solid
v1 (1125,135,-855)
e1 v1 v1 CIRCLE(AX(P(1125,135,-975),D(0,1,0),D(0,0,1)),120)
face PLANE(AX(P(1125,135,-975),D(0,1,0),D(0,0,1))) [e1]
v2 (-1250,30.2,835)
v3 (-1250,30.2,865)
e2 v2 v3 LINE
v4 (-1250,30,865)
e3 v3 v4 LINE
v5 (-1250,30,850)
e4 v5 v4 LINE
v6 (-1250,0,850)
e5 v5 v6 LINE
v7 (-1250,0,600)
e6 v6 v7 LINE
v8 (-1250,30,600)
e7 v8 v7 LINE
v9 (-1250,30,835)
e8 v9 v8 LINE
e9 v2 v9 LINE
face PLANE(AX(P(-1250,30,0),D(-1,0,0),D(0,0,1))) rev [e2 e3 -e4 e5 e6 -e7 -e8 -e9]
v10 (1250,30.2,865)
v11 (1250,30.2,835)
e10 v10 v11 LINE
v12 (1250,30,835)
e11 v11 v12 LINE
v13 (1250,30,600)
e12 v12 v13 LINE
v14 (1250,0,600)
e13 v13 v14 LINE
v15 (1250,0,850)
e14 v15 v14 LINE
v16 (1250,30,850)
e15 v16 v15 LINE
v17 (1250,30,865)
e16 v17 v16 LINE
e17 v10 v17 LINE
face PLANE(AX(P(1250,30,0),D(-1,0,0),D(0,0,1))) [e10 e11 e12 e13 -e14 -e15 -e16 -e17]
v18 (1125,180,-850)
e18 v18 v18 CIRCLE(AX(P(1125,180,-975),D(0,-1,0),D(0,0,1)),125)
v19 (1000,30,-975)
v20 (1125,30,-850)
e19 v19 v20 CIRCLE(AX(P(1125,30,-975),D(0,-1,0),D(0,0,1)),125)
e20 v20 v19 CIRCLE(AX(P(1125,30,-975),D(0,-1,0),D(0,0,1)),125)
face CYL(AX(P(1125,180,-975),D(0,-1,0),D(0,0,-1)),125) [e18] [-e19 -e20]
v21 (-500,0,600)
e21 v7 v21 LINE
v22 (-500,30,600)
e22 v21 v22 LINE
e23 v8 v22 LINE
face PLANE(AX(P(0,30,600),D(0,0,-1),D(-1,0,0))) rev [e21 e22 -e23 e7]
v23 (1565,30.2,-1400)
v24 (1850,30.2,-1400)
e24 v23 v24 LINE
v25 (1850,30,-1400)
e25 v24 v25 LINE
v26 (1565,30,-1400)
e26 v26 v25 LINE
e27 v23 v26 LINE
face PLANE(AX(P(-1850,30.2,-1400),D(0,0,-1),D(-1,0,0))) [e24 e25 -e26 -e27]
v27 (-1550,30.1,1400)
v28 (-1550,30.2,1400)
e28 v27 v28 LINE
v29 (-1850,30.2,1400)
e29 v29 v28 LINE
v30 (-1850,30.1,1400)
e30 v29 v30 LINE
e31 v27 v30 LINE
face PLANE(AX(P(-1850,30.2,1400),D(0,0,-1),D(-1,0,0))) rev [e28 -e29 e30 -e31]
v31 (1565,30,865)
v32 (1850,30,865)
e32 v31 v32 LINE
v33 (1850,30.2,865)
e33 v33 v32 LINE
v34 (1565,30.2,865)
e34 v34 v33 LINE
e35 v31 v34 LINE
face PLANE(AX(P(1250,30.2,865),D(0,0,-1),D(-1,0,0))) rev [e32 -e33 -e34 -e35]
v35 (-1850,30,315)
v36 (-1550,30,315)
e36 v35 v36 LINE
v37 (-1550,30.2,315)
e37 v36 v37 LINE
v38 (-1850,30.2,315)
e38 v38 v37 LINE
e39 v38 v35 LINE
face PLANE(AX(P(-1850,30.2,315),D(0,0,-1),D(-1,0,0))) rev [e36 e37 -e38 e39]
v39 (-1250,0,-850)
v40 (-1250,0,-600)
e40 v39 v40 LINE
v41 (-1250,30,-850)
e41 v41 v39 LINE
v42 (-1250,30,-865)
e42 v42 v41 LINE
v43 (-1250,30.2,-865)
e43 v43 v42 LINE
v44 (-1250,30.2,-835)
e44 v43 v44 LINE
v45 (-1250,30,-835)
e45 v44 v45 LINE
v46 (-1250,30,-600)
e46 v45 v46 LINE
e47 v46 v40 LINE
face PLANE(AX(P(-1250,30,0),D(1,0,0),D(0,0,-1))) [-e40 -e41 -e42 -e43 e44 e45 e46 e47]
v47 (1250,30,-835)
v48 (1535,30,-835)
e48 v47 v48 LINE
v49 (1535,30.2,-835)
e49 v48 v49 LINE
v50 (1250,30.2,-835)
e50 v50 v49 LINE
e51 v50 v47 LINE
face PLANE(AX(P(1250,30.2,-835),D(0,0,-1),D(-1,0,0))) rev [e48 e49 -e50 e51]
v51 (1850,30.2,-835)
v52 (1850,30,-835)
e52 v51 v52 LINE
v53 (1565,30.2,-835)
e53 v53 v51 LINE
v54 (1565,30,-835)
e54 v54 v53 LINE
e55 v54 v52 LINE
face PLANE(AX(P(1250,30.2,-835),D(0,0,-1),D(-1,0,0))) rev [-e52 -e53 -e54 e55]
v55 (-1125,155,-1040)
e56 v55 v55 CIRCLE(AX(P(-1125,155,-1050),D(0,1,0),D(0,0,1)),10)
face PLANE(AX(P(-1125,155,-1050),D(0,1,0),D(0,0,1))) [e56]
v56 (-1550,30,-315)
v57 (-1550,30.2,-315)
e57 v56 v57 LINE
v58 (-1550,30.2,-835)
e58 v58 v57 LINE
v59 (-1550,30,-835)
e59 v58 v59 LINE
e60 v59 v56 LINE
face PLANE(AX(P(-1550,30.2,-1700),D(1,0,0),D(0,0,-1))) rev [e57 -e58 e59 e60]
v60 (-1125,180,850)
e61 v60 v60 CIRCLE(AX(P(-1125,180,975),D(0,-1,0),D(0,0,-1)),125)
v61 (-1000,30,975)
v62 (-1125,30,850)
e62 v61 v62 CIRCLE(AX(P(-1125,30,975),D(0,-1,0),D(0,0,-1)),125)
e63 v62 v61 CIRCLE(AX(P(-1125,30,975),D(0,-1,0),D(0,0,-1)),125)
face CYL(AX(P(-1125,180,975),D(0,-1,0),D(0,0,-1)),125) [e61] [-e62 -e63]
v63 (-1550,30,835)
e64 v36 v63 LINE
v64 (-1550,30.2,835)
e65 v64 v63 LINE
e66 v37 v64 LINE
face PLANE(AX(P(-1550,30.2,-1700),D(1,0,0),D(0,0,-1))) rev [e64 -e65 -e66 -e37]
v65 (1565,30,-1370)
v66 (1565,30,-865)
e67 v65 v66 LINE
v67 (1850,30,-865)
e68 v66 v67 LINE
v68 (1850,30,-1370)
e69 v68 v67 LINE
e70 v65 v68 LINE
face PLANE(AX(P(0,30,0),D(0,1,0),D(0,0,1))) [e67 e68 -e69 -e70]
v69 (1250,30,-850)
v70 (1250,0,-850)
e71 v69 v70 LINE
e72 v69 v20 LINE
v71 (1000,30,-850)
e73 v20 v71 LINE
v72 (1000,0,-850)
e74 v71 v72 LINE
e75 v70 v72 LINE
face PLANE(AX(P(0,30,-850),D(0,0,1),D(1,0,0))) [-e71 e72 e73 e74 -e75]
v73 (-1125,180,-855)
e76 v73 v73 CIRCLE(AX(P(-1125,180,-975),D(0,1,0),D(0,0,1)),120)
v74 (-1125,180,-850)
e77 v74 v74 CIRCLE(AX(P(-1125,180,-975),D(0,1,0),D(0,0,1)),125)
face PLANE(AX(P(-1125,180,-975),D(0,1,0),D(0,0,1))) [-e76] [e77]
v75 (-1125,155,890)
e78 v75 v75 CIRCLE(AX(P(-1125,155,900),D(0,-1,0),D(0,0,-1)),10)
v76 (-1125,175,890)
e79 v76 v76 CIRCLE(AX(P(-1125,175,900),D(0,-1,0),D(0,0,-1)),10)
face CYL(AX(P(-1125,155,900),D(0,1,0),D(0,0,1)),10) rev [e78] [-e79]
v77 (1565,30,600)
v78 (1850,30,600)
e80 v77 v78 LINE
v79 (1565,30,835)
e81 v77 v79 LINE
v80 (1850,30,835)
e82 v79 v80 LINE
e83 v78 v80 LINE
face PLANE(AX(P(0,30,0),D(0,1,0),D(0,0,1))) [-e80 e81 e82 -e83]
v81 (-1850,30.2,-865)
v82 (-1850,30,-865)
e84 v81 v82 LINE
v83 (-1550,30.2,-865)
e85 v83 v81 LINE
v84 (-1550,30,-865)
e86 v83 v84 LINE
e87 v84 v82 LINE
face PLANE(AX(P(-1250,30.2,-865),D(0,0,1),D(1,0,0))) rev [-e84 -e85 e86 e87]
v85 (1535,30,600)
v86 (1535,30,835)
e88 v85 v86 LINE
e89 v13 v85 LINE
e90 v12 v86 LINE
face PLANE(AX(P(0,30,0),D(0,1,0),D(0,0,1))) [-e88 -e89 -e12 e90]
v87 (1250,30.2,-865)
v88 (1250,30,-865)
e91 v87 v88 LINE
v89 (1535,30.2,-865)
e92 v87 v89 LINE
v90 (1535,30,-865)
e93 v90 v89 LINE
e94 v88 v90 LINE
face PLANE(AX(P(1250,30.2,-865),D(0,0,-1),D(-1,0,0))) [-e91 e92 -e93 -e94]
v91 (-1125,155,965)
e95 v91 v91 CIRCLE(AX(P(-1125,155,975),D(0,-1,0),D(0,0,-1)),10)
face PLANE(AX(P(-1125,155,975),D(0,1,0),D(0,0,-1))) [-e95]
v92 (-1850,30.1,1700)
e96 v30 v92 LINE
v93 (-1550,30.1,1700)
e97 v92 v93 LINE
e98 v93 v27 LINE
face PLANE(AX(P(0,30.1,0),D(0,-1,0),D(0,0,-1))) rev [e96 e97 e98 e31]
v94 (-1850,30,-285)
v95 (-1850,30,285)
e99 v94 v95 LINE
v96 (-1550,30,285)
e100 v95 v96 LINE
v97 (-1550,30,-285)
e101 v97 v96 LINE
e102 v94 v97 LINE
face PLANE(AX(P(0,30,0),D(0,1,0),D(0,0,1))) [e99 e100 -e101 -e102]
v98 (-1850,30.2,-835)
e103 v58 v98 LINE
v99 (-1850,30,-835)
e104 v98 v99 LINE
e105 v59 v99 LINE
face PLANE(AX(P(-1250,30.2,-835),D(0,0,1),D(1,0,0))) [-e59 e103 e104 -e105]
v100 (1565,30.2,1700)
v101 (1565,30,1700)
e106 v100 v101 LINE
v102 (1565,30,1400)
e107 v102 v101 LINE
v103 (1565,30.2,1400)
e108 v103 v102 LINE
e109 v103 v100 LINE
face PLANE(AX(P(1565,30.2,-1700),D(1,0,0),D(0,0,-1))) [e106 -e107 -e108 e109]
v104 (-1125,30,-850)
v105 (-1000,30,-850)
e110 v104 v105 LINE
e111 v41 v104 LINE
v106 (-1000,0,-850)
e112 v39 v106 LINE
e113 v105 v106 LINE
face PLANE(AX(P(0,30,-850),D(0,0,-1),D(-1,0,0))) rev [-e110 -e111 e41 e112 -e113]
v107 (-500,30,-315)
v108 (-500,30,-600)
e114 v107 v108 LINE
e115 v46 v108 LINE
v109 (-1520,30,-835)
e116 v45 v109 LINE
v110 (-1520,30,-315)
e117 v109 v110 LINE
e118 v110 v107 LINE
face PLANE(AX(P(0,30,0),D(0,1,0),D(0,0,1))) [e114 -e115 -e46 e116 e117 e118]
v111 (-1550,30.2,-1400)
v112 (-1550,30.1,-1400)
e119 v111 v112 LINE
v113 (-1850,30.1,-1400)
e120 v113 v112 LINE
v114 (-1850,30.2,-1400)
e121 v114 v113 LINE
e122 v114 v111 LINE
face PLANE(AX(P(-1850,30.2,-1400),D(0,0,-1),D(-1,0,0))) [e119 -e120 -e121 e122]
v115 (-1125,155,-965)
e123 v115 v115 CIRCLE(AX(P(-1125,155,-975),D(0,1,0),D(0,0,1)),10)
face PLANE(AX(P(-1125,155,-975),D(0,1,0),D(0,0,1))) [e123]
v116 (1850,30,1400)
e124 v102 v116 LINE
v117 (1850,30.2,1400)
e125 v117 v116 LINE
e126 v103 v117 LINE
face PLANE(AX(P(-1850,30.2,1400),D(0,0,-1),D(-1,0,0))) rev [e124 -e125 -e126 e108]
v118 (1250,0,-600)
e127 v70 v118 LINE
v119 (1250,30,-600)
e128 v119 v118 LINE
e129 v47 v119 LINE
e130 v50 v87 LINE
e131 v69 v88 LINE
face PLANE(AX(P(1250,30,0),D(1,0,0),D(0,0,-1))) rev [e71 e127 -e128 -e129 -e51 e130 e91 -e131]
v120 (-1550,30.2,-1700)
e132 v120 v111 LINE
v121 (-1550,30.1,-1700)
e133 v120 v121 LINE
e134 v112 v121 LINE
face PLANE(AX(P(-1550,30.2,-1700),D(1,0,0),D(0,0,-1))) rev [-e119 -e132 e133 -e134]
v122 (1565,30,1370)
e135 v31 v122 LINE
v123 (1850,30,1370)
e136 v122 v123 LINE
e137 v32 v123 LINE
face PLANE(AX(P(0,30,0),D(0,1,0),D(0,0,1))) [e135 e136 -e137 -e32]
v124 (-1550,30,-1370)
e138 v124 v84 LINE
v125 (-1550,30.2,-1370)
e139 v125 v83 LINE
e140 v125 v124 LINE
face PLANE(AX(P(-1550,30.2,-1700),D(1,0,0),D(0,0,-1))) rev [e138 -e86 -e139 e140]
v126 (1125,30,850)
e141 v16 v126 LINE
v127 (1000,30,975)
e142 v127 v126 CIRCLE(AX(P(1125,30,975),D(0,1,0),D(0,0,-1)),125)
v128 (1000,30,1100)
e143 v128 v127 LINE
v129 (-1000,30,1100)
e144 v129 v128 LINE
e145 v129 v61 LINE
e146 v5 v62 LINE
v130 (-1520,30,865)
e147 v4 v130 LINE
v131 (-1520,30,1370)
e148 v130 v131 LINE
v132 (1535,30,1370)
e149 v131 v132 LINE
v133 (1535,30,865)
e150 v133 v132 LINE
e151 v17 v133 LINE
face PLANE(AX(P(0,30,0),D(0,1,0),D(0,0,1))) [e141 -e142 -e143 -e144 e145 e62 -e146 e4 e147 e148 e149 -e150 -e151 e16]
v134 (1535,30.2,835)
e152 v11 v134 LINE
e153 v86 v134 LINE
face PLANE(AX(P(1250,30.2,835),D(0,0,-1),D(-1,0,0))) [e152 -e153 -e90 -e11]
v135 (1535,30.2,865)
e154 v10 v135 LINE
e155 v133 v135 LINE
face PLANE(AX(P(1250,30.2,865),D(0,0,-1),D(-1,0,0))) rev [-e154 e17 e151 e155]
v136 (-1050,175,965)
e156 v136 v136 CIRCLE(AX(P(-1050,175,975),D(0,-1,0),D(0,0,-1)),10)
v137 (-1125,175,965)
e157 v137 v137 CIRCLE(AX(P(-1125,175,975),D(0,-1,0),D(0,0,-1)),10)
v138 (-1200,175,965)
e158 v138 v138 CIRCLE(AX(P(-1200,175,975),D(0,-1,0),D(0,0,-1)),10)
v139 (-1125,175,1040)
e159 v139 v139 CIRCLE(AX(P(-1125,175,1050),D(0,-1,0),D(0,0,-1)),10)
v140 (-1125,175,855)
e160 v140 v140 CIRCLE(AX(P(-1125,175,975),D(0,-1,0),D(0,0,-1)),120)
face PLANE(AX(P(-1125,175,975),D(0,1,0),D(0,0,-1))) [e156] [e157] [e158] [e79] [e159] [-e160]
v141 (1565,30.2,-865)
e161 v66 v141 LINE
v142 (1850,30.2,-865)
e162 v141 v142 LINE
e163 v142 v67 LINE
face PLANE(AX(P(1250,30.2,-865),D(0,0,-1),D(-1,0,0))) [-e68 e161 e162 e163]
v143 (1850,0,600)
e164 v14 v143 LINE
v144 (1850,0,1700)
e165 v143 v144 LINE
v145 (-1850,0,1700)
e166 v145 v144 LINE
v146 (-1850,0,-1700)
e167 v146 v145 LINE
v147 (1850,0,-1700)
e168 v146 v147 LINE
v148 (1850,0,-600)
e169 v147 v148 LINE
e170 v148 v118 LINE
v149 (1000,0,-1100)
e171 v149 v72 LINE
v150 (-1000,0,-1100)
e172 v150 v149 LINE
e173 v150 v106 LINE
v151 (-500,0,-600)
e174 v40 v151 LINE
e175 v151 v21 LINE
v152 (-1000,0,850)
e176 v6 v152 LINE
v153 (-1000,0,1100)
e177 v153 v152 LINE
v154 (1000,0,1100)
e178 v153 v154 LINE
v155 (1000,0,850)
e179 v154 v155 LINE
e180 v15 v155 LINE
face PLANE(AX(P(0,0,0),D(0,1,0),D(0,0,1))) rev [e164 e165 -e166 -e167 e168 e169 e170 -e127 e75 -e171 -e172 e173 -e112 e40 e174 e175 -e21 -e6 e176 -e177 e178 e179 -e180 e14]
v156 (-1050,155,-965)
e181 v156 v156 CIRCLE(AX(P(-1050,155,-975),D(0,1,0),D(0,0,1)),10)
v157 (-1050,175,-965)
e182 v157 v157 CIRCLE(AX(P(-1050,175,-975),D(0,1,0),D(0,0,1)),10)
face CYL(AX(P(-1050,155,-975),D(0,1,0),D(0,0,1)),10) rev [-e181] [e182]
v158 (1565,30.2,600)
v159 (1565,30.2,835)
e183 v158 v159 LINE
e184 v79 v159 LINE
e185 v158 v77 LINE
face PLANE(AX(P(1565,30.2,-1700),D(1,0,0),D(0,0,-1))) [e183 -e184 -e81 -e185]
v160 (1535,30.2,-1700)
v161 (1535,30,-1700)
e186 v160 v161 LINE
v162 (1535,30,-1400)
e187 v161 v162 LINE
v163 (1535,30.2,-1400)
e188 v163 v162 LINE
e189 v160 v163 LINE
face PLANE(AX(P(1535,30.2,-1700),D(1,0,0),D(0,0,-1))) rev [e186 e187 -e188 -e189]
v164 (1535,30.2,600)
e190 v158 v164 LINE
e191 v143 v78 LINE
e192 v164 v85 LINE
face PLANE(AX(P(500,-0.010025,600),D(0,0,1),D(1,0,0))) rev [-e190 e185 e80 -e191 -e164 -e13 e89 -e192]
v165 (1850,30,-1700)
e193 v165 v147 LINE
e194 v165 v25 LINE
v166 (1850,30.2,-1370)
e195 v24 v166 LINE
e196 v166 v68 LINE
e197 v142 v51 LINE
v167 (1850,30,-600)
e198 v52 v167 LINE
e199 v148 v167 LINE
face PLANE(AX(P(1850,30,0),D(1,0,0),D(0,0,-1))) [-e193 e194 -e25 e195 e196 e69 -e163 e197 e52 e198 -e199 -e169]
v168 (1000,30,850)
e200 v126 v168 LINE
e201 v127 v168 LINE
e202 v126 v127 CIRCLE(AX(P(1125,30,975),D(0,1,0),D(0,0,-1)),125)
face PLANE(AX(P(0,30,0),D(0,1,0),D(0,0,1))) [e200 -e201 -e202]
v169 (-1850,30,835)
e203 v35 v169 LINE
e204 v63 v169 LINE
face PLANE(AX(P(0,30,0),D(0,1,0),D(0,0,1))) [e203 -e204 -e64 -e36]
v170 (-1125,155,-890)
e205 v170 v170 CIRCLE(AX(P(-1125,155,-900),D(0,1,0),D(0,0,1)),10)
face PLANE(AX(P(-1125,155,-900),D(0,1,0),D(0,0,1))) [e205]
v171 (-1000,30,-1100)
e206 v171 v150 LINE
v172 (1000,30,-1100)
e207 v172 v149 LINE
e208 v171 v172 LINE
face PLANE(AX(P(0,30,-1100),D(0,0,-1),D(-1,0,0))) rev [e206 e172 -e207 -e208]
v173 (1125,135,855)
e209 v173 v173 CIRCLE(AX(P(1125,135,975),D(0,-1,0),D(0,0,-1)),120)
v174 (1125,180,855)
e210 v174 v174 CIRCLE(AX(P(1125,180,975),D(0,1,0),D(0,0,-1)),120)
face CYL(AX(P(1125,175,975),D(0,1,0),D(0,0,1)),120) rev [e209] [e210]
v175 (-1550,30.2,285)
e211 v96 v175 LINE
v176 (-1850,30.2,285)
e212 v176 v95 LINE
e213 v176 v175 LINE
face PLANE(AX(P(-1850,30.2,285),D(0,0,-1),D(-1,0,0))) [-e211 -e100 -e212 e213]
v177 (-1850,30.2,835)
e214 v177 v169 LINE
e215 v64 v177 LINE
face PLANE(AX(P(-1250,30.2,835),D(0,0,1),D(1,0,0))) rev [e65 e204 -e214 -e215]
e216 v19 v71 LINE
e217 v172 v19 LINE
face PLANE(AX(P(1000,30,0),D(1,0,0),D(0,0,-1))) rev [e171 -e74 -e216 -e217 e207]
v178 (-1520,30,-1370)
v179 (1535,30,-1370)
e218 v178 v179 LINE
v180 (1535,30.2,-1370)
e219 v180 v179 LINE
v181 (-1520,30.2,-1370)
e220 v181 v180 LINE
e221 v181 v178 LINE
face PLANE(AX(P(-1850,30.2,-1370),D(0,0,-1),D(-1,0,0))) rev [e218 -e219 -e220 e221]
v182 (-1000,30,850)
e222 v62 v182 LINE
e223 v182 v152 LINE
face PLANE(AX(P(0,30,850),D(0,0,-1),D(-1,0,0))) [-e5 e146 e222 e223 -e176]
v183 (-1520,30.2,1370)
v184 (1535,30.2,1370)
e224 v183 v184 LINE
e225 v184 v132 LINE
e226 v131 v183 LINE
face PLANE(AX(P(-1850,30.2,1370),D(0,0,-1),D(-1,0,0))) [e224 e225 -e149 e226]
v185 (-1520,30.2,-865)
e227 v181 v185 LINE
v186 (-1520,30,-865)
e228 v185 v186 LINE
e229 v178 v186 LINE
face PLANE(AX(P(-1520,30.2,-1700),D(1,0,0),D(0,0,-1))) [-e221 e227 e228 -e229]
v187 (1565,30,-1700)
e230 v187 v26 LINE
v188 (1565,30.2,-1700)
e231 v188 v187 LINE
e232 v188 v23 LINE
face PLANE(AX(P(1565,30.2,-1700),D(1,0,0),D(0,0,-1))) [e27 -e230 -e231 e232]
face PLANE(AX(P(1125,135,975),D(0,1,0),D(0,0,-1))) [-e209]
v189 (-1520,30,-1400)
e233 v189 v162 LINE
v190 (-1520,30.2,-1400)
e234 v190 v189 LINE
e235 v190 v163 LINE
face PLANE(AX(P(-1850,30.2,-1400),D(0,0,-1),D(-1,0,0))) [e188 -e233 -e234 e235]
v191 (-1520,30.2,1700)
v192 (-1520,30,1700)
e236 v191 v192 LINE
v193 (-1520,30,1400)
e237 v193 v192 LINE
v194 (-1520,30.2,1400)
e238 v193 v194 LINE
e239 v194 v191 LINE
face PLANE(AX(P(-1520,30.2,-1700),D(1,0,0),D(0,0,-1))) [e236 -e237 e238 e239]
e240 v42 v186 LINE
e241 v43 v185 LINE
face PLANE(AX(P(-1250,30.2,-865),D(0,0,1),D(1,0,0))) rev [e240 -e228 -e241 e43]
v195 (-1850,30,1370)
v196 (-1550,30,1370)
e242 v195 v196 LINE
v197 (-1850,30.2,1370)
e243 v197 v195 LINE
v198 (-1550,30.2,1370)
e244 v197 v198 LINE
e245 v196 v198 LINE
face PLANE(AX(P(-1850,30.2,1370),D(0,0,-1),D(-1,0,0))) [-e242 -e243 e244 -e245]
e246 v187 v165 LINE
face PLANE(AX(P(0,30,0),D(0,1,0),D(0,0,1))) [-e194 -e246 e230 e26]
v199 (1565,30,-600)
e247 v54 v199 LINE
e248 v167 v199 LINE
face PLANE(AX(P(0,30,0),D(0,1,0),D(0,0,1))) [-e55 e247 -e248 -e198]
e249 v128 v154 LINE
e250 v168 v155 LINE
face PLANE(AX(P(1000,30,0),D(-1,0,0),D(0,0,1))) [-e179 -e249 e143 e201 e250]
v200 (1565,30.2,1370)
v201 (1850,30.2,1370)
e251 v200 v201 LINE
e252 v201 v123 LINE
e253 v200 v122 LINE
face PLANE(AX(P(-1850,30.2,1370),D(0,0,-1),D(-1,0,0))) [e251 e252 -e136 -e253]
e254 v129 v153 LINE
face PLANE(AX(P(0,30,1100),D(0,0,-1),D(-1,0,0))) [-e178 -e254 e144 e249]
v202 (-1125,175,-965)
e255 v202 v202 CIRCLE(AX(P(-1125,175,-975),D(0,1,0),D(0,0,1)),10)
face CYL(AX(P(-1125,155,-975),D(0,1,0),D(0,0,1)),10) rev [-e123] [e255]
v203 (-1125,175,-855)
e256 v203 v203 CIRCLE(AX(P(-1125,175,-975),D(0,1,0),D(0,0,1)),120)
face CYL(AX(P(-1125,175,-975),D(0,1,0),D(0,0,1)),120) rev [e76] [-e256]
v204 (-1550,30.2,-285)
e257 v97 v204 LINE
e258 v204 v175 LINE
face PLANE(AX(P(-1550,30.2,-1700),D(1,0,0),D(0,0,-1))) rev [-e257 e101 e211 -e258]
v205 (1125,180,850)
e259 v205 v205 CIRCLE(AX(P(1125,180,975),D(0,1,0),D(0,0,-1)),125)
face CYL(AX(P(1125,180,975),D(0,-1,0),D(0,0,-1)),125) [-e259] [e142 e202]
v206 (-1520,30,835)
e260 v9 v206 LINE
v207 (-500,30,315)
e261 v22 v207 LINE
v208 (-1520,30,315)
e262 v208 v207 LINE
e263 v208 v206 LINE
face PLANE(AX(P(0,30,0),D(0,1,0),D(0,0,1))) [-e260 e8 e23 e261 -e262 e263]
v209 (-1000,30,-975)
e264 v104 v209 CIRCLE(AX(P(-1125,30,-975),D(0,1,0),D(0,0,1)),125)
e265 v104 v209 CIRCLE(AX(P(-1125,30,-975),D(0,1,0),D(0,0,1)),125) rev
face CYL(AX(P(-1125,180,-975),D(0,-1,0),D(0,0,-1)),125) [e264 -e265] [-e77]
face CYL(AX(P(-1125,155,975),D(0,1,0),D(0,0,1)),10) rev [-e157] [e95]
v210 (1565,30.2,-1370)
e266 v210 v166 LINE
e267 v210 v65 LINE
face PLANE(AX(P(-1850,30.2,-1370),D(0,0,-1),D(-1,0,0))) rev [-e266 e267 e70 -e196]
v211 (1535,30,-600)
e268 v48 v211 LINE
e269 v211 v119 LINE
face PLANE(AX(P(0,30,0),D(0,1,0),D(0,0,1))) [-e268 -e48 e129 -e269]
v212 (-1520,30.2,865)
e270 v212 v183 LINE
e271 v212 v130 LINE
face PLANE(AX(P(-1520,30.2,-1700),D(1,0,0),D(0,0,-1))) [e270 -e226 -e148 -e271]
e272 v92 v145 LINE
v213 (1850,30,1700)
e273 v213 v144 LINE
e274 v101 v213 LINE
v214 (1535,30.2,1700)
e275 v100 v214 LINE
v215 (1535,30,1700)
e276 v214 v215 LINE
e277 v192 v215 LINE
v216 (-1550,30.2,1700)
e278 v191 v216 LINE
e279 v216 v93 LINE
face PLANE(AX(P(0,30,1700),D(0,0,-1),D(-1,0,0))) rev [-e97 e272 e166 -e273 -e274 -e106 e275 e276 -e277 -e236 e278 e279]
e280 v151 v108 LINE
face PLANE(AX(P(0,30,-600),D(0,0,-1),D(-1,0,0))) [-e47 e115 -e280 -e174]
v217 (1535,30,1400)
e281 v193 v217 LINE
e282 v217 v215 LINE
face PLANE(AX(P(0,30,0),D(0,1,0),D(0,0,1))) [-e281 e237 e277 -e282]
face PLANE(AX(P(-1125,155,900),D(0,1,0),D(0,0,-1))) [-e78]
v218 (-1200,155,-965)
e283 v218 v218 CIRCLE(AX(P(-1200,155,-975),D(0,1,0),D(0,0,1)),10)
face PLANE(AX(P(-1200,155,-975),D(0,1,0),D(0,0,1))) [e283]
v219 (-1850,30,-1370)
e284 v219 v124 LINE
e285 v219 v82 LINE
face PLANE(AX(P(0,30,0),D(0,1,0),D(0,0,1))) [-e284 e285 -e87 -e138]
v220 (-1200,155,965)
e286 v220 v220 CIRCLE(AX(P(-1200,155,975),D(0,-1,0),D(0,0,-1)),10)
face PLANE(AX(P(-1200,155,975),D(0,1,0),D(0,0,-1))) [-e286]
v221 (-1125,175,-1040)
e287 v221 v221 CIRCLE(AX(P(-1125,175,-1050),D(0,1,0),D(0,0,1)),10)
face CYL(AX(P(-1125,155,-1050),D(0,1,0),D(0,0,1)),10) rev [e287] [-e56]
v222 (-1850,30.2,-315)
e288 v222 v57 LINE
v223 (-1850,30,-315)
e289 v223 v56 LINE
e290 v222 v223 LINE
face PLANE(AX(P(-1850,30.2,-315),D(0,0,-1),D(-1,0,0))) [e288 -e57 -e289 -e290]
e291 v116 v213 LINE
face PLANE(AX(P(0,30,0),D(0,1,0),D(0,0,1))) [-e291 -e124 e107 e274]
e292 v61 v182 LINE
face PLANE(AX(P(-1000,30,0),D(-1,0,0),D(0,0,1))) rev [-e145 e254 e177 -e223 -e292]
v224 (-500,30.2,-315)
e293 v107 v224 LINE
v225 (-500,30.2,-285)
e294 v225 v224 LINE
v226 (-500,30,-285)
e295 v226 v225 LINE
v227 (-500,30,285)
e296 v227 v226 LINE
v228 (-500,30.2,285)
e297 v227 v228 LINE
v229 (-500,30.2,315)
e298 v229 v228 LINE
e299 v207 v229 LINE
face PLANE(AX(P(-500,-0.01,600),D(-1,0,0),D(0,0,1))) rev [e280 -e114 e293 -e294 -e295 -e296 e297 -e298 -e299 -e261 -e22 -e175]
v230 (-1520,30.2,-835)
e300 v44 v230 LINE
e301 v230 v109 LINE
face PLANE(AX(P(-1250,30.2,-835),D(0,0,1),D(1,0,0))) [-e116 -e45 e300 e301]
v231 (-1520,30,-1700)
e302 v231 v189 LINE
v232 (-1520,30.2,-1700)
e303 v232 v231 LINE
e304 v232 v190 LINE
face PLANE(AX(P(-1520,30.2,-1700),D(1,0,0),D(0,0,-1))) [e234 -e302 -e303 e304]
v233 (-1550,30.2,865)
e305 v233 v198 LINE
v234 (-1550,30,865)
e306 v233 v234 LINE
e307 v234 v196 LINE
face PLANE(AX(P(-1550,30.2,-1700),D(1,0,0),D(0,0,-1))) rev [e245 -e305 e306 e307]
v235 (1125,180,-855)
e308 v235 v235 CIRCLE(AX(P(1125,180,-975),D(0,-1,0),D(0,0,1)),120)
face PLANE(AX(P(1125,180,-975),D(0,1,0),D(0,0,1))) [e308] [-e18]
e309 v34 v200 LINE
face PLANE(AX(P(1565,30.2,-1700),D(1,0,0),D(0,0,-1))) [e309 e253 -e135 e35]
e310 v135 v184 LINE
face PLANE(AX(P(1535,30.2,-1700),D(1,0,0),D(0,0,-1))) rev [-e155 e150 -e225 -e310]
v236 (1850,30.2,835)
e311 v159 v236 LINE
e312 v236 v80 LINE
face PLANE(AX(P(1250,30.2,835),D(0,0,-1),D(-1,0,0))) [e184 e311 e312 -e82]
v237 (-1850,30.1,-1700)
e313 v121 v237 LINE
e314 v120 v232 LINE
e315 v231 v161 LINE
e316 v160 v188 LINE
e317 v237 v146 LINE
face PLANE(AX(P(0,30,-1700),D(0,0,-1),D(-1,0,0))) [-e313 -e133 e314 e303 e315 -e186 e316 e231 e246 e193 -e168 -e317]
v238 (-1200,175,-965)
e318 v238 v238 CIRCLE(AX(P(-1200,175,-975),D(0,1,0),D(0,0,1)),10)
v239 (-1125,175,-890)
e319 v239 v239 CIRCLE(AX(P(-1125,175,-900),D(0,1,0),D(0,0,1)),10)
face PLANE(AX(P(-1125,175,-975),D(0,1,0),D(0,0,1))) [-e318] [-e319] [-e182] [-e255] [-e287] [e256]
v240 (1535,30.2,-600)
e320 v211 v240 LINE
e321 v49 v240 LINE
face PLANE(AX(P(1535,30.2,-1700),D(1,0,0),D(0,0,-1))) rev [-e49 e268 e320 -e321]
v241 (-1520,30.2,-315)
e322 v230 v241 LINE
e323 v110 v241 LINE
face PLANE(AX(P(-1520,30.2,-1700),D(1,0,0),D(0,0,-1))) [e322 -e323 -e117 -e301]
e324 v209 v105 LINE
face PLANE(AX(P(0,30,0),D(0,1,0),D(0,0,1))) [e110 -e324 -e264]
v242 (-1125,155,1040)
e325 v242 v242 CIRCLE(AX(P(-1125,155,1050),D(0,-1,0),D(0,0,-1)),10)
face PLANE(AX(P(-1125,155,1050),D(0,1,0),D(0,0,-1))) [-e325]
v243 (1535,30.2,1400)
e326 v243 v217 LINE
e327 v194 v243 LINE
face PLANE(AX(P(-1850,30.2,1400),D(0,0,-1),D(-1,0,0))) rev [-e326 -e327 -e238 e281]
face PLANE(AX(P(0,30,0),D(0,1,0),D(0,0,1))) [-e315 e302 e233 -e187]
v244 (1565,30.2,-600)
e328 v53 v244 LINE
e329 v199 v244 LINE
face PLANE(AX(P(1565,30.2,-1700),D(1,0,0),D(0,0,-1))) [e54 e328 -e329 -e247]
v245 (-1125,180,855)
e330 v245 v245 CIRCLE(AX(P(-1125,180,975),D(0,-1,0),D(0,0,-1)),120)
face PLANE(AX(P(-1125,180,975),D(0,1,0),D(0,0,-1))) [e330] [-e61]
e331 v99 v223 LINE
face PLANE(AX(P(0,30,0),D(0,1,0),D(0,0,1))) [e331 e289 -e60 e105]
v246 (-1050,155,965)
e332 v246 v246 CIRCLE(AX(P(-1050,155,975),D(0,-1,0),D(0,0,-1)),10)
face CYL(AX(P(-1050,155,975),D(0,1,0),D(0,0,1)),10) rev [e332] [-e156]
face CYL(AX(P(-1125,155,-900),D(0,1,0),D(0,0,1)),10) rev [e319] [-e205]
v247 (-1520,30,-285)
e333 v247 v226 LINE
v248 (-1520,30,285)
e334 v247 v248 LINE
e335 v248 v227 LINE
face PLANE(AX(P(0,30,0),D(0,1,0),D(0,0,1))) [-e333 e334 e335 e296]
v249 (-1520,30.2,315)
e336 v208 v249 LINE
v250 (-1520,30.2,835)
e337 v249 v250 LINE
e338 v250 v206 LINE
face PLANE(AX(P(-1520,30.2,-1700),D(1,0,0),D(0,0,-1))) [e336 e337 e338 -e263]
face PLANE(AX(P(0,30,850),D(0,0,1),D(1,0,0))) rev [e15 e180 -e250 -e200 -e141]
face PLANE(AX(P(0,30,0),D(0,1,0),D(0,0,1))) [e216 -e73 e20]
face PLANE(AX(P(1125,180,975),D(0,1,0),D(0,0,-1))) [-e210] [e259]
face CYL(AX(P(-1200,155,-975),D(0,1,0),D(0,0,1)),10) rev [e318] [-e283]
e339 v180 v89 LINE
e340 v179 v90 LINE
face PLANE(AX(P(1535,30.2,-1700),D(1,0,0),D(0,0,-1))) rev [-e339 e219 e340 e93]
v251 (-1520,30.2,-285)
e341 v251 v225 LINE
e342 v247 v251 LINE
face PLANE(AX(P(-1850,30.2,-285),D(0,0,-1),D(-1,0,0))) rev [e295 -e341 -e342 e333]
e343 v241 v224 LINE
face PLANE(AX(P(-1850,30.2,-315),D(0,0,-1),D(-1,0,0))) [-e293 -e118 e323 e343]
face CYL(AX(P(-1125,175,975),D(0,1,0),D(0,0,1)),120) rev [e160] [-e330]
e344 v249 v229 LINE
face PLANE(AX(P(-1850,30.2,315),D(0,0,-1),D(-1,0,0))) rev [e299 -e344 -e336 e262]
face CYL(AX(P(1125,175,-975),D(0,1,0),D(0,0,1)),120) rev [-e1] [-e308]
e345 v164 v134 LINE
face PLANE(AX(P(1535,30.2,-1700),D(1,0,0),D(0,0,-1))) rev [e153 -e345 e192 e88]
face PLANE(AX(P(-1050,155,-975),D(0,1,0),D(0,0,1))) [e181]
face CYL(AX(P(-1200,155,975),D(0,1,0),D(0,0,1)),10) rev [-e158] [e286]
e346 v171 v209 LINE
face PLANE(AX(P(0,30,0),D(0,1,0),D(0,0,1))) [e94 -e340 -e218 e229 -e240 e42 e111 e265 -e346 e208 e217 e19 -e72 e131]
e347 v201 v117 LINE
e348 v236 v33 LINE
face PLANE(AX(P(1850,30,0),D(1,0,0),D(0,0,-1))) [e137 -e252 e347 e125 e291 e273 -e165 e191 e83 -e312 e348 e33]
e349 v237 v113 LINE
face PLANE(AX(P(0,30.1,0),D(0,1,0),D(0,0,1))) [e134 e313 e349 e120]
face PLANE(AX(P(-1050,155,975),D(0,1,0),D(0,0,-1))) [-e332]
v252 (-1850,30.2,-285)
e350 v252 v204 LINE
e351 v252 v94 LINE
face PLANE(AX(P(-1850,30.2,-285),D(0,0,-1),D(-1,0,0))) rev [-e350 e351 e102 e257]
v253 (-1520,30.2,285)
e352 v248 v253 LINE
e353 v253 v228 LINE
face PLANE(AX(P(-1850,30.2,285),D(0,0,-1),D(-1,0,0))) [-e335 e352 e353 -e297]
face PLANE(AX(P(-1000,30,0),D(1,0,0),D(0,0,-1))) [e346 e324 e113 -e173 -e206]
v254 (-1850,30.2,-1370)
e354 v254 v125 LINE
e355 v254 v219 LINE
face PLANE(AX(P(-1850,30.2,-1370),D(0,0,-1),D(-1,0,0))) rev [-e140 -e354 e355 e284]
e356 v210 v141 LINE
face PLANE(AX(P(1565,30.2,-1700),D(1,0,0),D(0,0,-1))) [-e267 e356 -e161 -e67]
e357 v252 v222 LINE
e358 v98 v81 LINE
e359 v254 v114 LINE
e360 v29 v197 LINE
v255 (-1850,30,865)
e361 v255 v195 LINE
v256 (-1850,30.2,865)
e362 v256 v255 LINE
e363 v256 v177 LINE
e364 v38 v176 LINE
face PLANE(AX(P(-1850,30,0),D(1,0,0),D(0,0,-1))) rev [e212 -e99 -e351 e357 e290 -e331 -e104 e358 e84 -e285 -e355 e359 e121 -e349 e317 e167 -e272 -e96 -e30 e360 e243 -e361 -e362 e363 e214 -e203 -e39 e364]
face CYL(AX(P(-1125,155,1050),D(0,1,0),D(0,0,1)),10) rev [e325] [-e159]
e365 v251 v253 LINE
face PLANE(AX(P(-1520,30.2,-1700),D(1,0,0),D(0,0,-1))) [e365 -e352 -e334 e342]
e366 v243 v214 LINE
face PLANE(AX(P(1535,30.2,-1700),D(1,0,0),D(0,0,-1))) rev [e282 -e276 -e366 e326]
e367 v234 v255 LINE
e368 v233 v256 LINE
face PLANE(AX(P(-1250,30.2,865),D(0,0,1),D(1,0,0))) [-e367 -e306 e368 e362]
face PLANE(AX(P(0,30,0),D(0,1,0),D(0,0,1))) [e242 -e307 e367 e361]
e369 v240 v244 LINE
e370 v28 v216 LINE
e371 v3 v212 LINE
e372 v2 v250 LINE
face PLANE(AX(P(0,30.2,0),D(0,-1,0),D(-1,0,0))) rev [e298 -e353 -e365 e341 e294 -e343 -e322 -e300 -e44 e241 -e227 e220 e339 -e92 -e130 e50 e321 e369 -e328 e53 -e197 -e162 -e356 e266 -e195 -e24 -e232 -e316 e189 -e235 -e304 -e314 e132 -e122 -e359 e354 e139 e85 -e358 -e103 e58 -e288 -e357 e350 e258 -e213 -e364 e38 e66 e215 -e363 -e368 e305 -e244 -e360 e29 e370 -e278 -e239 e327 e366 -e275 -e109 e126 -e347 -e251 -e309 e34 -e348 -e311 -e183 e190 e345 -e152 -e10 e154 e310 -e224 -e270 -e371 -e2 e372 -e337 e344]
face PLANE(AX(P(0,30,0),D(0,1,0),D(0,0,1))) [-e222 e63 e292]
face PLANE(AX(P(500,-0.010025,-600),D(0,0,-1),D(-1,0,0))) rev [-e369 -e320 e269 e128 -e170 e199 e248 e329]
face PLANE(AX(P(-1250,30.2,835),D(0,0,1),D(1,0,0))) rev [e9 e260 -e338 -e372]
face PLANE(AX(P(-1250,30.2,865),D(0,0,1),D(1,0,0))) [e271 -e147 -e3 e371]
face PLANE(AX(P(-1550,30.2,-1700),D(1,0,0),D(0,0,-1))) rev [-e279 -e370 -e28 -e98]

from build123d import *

# Parameters (mm, degrees)
SKETCH1_W               = 3700
SKETCH1_H               = 3400
SKETCH1_W_2             = 2500
SKETCH1_H_2             = 500
SKETCH1_W_3             = 250
SKETCH1_H_3             = 250
BOSS_EXTRUDE1_DEPTH     = 30
BOSS_EXTRUDE2_DEPTH     = 600
SKETCH3_R               = 125
BOSS_EXTRUDE3_DEPTH     = 150
SKETCH4_R               = 120
CUT_EXTRUDE1_DEPTH      = 5
SKETCH5_R               = 10
CUT_EXTRUDE2_DEPTH      = 20
MIRROR3_COPY_1_SKETCH_R = 125
MIRROR3_COPY_1_DEPTH    = 150
MIRROR3_COPY_2_SKETCH_R = 120
MIRROR3_COPY_2_DEPTH    = 5
MIRROR3_COPY_3_SKETCH_R = 10
MIRROR3_COPY_3_DEPTH    = 20
SKETCH6_R               = 120
CUT_EXTRUDE3_DEPTH      = 40
SKETCH7_W               = 300
SKETCH7_H               = 300
BOSS_EXTRUDE4_DEPTH     = 0.1
SKETCH8_W               = 3700
SKETCH8_H               = 30
SKETCH8_W_2             = 30
SKETCH8_H_2             = 3400
SKETCH8_W_3             = 600
SKETCH8_W_4             = 2350
EXTRUDE_THIN1_DEPTH     = 0.2
SKETCH9_W               = 230.740107676
SKETCH9_H               = 30
EXTRUDE_THIN2_DEPTH     = 0.1
SKETCH10_W              = 600
SKETCH10_H              = 30
EXTRUDE_THIN3_DEPTH     = 0.1
SKETCH11_R              = 21
BOSS_EXTRUDE5_DEPTH     = 350
SPLIT3_SURFACE_1_BACK   = 5040.286
SPLIT3_SURFACE_1_DEPTH  = 10080.572
SPLIT3_SURFACE_2_BACK   = 5040.286
SPLIT3_SURFACE_2_DEPTH  = 10080.572
SAVE_START              = -600
SAVE_BODIES1_DEPTH      = 1200
SPLIT5_SURFACE_3_BACK   = 5040.286
SPLIT5_SURFACE_3_DEPTH  = 10080.572
SPLIT5_SURFACE_4_BACK   = 5040.286
SPLIT5_SURFACE_4_DEPTH  = 10080.572
SAVE_BODIES2_OUTLINE_W  = 1350
SAVE_BODIES2_OUTLINE_H  = 1200
SAVE_BODIES2_DEPTH      = 380


# Read off the part's stored shape, not the designer's step: Save Bodies1, Save Bodies2
with BuildPart() as part:
    # Sketch1 → Boss-Extrude1 (new body)
    # profile 1 of 5: a face of its own
    with BuildSketch(Plane(origin=(0, 0, 0), x_dir=(1, 0, 0), z_dir=(0, 1, 0))):
        Rectangle(SKETCH1_W, SKETCH1_H)
        with Locations((0, 850)):
            Rectangle(SKETCH1_W_2, SKETCH1_H_2, mode=Mode.SUBTRACT)
        with Locations((0, -850)):
            Rectangle(SKETCH1_W_2, SKETCH1_H_2, mode=Mode.SUBTRACT)
    # profile 2 of 5: a face of its own
    with BuildSketch(Plane(origin=(0, 0, 0), x_dir=(1, 0, 0), z_dir=(0, 1, 0))):
        with Locations((-1125, 975)):
            Rectangle(SKETCH1_W_3, SKETCH1_H_3)
    # profile 3 of 5: a face of its own
    with BuildSketch(Plane(origin=(0, 0, 0), x_dir=(1, 0, 0), z_dir=(0, 1, 0))):
        with Locations((1125, 975)):
            Rectangle(SKETCH1_W_3, SKETCH1_H_3)
    # profile 4 of 5: a face of its own
    with BuildSketch(Plane(origin=(0, 0, 0), x_dir=(1, 0, 0), z_dir=(0, 1, 0))):
        with Locations((1125, -975)):
            Rectangle(SKETCH1_W_3, SKETCH1_H_3)
    # profile 5 of 5: a face of its own
    with BuildSketch(Plane(origin=(0, 0, 0), x_dir=(1, 0, 0), z_dir=(0, 1, 0))):
        with Locations((-1125, -975)):
            Rectangle(SKETCH1_W_3, SKETCH1_H_3)
    extrude(amount=BOSS_EXTRUDE1_DEPTH)

    # Sketch2 → Boss-Extrude2 (add, symmetric)
    with BuildSketch(Plane.XY):
        Polygon((-500, 30), (-300, 145.470053838), (300, 145.470053838), (500, 30), align=None)
    extrude(amount=BOSS_EXTRUDE2_DEPTH, both=True)

    # Sketch3 → Boss-Extrude3 (add)
    with BuildSketch(Plane(origin=(0, 30, 0), x_dir=(1, 0, 0), z_dir=(0, 1, 0))):
        with Locations(Location((-1125, 975, 0), (0, 0, 270))):
            Circle(SKETCH3_R)
    boss_extrude3 = extrude(amount=BOSS_EXTRUDE3_DEPTH)

    # Sketch4 → Cut-Extrude1 (cut)
    with BuildSketch(Plane(origin=(0, 180, 0), x_dir=(1, 0, 0), z_dir=(0, 1, 0))):
        with Locations(Location((-1125, 975, 0), (0, 0, 270))):
            Circle(SKETCH4_R)
    cut_extrude1 = extrude(amount=-CUT_EXTRUDE1_DEPTH, mode=Mode.SUBTRACT)

    # Sketch5 → Cut-Extrude2 (cut)
    with BuildSketch(Plane(origin=(0, 175, 0), x_dir=(1, 0, 0), z_dir=(0, 1, 0))):
        with Locations(Location((-1125, 975, 0), (0, 0, 270))):
            Circle(SKETCH5_R)
        with Locations(Location((-1050, 975, 0), (0, 0, 270))):
            Circle(SKETCH5_R)
        with Locations(Location((-1125, 900, 0), (0, 0, 270))):
            Circle(SKETCH5_R)
        with Locations(Location((-1200, 975, 0), (0, 0, 270))):
            Circle(SKETCH5_R)
        with Locations(Location((-1125, 1050, 0), (0, 0, 270))):
            Circle(SKETCH5_R)
    cut_extrude2 = extrude(amount=-CUT_EXTRUDE2_DEPTH, mode=Mode.SUBTRACT)

    # Mirror2: Boss-Extrude3, Cut-Extrude1, Cut-Extrude2 across plane
    add(boss_extrude3.mirror(Plane.XY))
    add(cut_extrude1.mirror(Plane.XY), mode=Mode.SUBTRACT)
    add(cut_extrude2.mirror(Plane.XY), mode=Mode.SUBTRACT)

    # Mirror3: Boss-Extrude3, Cut-Extrude1, Cut-Extrude2 across plane
    add(boss_extrude3.mirror(Plane(origin=(0, 0, 0), x_dir=(0, 0, 1), z_dir=(1, 0, 0))))
    add(cut_extrude1.mirror(Plane(origin=(0, 0, 0), x_dir=(0, 0, 1), z_dir=(1, 0, 0))), mode=Mode.SUBTRACT)
    add(cut_extrude2.mirror(Plane(origin=(0, 0, 0), x_dir=(0, 0, 1), z_dir=(1, 0, 0))), mode=Mode.SUBTRACT)

    # Mirror3 copy 1 sketch → Mirror3 copy 1 (add)
    with BuildSketch(Plane(origin=(0, 30, 0), x_dir=(-1, 0, 0), z_dir=(0, 1, 0))):
        with Locations(Location((-1125, 975, 0), (0, 0, 270))):
            Circle(MIRROR3_COPY_1_SKETCH_R)
    extrude(amount=MIRROR3_COPY_1_DEPTH)

    # Mirror3 copy 2 sketch → Mirror3 copy 2 (cut)
    with BuildSketch(Plane(origin=(0, 180, 0), x_dir=(-1, 0, 0), z_dir=(0, 1, 0))):
        with Locations(Location((-1125, 975, 0), (0, 0, 270))):
            Circle(MIRROR3_COPY_2_SKETCH_R)
    extrude(amount=-MIRROR3_COPY_2_DEPTH, mode=Mode.SUBTRACT)

    # Mirror3 copy 3 sketch → Mirror3 copy 3 (cut)
    with BuildSketch(Plane(origin=(0, 175, 0), x_dir=(-1, 0, 0), z_dir=(0, 1, 0))):
        with Locations(Location((-1125, 975, 0), (0, 0, 270))):
            Circle(MIRROR3_COPY_3_SKETCH_R)
        with Locations(Location((-1050, 975, 0), (0, 0, 270))):
            Circle(MIRROR3_COPY_3_SKETCH_R)
        with Locations(Location((-1125, 900, 0), (0, 0, 270))):
            Circle(MIRROR3_COPY_3_SKETCH_R)
        with Locations(Location((-1200, 975, 0), (0, 0, 270))):
            Circle(MIRROR3_COPY_3_SKETCH_R)
        with Locations(Location((-1125, 1050, 0), (0, 0, 270))):
            Circle(MIRROR3_COPY_3_SKETCH_R)
    extrude(amount=-MIRROR3_COPY_3_DEPTH, mode=Mode.SUBTRACT)

    # Sketch6 → Cut-Extrude3 (cut)
    with BuildSketch(Plane(origin=(0, 175, 0), x_dir=(1, 0, 0), z_dir=(0, 1, 0))):
        with Locations(Location((1125, 975, 0), (0, 0, 270))):
            Circle(SKETCH6_R)
    cut_extrude3 = extrude(amount=-CUT_EXTRUDE3_DEPTH, mode=Mode.SUBTRACT)

    # Mirror4: Cut-Extrude3 across plane
    add(cut_extrude3.mirror(Plane.XY), mode=Mode.SUBTRACT)

    # Sketch7 → Boss-Extrude4 (add)
    with BuildSketch(Plane(origin=(0, 30, 0), x_dir=(1, 0, 0), z_dir=(0, 1, 0))):
        with Locations((-1700, 1550)):
            Rectangle(SKETCH7_W, SKETCH7_H)
        with Locations((-1700, -1550)):
            Rectangle(SKETCH7_W, SKETCH7_H)
    extrude(amount=BOSS_EXTRUDE4_DEPTH)

    # Sketch8 → Extrude-Thin1 (add)
    with BuildSketch(Plane(origin=(0, 30, 0), x_dir=(1, 0, 0), z_dir=(0, 1, 0))):
        with Locations((0, 1385)):
            Rectangle(SKETCH8_W, SKETCH8_H)
        with Locations((-1535, 0)):
            Rectangle(SKETCH8_W_2, SKETCH8_H_2)
        with Locations((1550, 0)):
            Rectangle(SKETCH8_W_2, SKETCH8_H_2)
        with Locations((-1550, 850)):
            Rectangle(SKETCH8_W_3, SKETCH8_H)
        with Locations((-675, 300)):
            Rectangle(SKETCH8_W_4, SKETCH8_H)
        with Locations((-675, -300)):
            Rectangle(SKETCH8_W_4, SKETCH8_H)
        with Locations((0, -1385)):
            Rectangle(SKETCH8_W, SKETCH8_H)
        with Locations((-1550, -850)):
            Rectangle(SKETCH8_W_3, SKETCH8_H)
        with Locations((1550, 850)):
            Rectangle(SKETCH8_W_3, SKETCH8_H)
        with Locations((1550, -850)):
            Rectangle(SKETCH8_W_3, SKETCH8_H)
    extrude(amount=EXTRUDE_THIN1_DEPTH)

    # Sketch9 → Extrude-Thin2 (add)
    with BuildSketch(Plane(origin=(-137.990381057, 239.006350946, 0), x_dir=(0.8660254037844415, 0.4999999999999951, 0), z_dir=(-0.49999999999999517, 0.8660254037844416, 0))):
        with Locations((-302.442648054, 300)):
            Rectangle(SKETCH9_W, SKETCH9_H)
        with Locations((-302.442648054, -300)):
            Rectangle(SKETCH9_W, SKETCH9_H)
    extrude_thin2 = extrude(amount=EXTRUDE_THIN2_DEPTH)

    # Sketch10 → Extrude-Thin3 (add)
    with BuildSketch(Plane(origin=(0, 145.470053838, 0), x_dir=(1, 0, 0), z_dir=(0, 1, 0))):
        with Locations((0, 300)):
            Rectangle(SKETCH10_W, SKETCH10_H)
        with Locations((0, -300)):
            Rectangle(SKETCH10_W, SKETCH10_H)
    extrude(amount=EXTRUDE_THIN3_DEPTH)

    # Mirror5: Extrude-Thin2 across plane
    add(extrude_thin2.mirror(Plane(origin=(0, 0, 0), x_dir=(0, 0, 1), z_dir=(1, 0, 0))))

    # Sketch11 → Boss-Extrude5 (add)
    with BuildSketch(Plane(origin=(0, 30, 0), x_dir=(1, 0, 0), z_dir=(0, 1, 0))):
        with Locations(Location((850, -298.836957303, 0), (0, 0, 270))):
            Circle(SKETCH11_R)
        with Locations(Location((1050, -448.836957303, 0), (0, 0, 270))):
            Circle(SKETCH11_R)
        with Locations(Location((1450, -298.836957303, 0), (0, 0, 270))):
            Circle(SKETCH11_R)
        with Locations(Location((1250, -148.836957303, 0), (0, 0, 270))):
            Circle(SKETCH11_R)
    boss_extrude5 = extrude(amount=BOSS_EXTRUDE5_DEPTH)

    # Mirror6: Boss-Extrude5 across plane
    add(boss_extrude5.mirror(Plane.XY))


with BuildPart() as body_2:
    # Split3: the piece behind the surface
    add(part.part)
    # Split3 surface: a surface, the sketch's curves swept straight by 10080.572 mm
    with BuildLine(Plane(origin=(0, 30, 0), x_dir=(1, 0, 0), z_dir=(0, 1, 0)).offset(-SPLIT3_SURFACE_1_BACK), mode=Mode.PRIVATE) as split3_surface_1_path:
        Line((500, -600), (-500, -600))
        Line((-500, -600), (-500, 600))
        Line((-500, 600), (500, 600))
        Line((500, 600), (500, -600))
    split3_surface_1 = Shell.extrude(split3_surface_1_path.wire(), (0 * SPLIT3_SURFACE_1_DEPTH, 1 * SPLIT3_SURFACE_1_DEPTH, 0 * SPLIT3_SURFACE_1_DEPTH))
    split(bisect_by=split3_surface_1, keep=Keep.BOTTOM)

    # Save Bodies1 outline → Save Bodies1 (cut)
    with BuildSketch(Plane.XY.offset(SAVE_START)):
        Polygon((500, 30.2), (499.853589838, 30.2), (300.05, 145.556656378), (300, 145.470053838), (300, 145.570053838), (-300, 145.570053838), (-300, 145.470053838), (-300.05, 145.556656378), (-499.853589838, 30.2), (-500, 30.2), (-500, 0), (500, 0), align=None)
    extrude(amount=SAVE_BODIES1_DEPTH, mode=Mode.SUBTRACT)


with BuildPart() as part_1:
    add(part.part)

    # Split3: split by a surface, the side it looks to stays
    # Split3 surface: a surface, the sketch's curves swept straight by 10080.572 mm
    with BuildLine(Plane(origin=(0, 30, 0), x_dir=(1, 0, 0), z_dir=(0, 1, 0)).offset(-SPLIT3_SURFACE_2_BACK), mode=Mode.PRIVATE) as split3_surface_2_path:
        Line((500, -600), (-500, -600))
        Line((-500, -600), (-500, 600))
        Line((-500, 600), (500, 600))
        Line((500, 600), (500, -600))
    split3_surface_2 = Shell.extrude(split3_surface_2_path.wire(), (0 * SPLIT3_SURFACE_2_DEPTH, 1 * SPLIT3_SURFACE_2_DEPTH, 0 * SPLIT3_SURFACE_2_DEPTH))
    split(bisect_by=split3_surface_2, keep=Keep.TOP)


with BuildPart() as body_2_2:
    # Split5: the piece behind the surface
    add(part_1.part)
    # Split5 surface: a surface, the sketch's curves swept straight by 10080.572 mm
    with BuildLine(Plane(origin=(0, 30, 0), x_dir=(1, 0, 0), z_dir=(0, 1, 0)).offset(-SPLIT5_SURFACE_3_BACK), mode=Mode.PRIVATE) as split5_surface_3_path:
        Line((500, 600), (1850, 600))
        Line((1850, 600), (1850, -600))
        Line((1850, -600), (500, -600))
        Line((500, -600), (500, 600))
    split5_surface_3 = Shell.extrude(split5_surface_3_path.wire(), (0 * SPLIT5_SURFACE_3_DEPTH, 1 * SPLIT5_SURFACE_3_DEPTH, 0 * SPLIT5_SURFACE_3_DEPTH))
    split(bisect_by=split5_surface_3, keep=Keep.BOTTOM)

    # Save Bodies2 outline → Save Bodies2 (cut)
    with BuildSketch(Plane(origin=(0, 0, 0), x_dir=(1, 0, 0), z_dir=(0, 1, 0))):
        with Locations((1175, 0)):
            Rectangle(SAVE_BODIES2_OUTLINE_W, SAVE_BODIES2_OUTLINE_H)
    extrude(amount=SAVE_BODIES2_DEPTH, mode=Mode.SUBTRACT)


with BuildPart() as part_2:
    add(part_1.part)

    # Split5: split by a surface, the side it looks to stays
    # Split5 surface: a surface, the sketch's curves swept straight by 10080.572 mm
    with BuildLine(Plane(origin=(0, 30, 0), x_dir=(1, 0, 0), z_dir=(0, 1, 0)).offset(-SPLIT5_SURFACE_4_BACK), mode=Mode.PRIVATE) as split5_surface_4_path:
        Line((500, 600), (1850, 600))
        Line((1850, 600), (1850, -600))
        Line((1850, -600), (500, -600))
        Line((500, -600), (500, 600))
    split5_surface_4 = Shell.extrude(split5_surface_4_path.wire(), (0 * SPLIT5_SURFACE_4_DEPTH, 1 * SPLIT5_SURFACE_4_DEPTH, 0 * SPLIT5_SURFACE_4_DEPTH))
    split(bisect_by=split5_surface_4, keep=Keep.TOP)


solid = part_2.part
